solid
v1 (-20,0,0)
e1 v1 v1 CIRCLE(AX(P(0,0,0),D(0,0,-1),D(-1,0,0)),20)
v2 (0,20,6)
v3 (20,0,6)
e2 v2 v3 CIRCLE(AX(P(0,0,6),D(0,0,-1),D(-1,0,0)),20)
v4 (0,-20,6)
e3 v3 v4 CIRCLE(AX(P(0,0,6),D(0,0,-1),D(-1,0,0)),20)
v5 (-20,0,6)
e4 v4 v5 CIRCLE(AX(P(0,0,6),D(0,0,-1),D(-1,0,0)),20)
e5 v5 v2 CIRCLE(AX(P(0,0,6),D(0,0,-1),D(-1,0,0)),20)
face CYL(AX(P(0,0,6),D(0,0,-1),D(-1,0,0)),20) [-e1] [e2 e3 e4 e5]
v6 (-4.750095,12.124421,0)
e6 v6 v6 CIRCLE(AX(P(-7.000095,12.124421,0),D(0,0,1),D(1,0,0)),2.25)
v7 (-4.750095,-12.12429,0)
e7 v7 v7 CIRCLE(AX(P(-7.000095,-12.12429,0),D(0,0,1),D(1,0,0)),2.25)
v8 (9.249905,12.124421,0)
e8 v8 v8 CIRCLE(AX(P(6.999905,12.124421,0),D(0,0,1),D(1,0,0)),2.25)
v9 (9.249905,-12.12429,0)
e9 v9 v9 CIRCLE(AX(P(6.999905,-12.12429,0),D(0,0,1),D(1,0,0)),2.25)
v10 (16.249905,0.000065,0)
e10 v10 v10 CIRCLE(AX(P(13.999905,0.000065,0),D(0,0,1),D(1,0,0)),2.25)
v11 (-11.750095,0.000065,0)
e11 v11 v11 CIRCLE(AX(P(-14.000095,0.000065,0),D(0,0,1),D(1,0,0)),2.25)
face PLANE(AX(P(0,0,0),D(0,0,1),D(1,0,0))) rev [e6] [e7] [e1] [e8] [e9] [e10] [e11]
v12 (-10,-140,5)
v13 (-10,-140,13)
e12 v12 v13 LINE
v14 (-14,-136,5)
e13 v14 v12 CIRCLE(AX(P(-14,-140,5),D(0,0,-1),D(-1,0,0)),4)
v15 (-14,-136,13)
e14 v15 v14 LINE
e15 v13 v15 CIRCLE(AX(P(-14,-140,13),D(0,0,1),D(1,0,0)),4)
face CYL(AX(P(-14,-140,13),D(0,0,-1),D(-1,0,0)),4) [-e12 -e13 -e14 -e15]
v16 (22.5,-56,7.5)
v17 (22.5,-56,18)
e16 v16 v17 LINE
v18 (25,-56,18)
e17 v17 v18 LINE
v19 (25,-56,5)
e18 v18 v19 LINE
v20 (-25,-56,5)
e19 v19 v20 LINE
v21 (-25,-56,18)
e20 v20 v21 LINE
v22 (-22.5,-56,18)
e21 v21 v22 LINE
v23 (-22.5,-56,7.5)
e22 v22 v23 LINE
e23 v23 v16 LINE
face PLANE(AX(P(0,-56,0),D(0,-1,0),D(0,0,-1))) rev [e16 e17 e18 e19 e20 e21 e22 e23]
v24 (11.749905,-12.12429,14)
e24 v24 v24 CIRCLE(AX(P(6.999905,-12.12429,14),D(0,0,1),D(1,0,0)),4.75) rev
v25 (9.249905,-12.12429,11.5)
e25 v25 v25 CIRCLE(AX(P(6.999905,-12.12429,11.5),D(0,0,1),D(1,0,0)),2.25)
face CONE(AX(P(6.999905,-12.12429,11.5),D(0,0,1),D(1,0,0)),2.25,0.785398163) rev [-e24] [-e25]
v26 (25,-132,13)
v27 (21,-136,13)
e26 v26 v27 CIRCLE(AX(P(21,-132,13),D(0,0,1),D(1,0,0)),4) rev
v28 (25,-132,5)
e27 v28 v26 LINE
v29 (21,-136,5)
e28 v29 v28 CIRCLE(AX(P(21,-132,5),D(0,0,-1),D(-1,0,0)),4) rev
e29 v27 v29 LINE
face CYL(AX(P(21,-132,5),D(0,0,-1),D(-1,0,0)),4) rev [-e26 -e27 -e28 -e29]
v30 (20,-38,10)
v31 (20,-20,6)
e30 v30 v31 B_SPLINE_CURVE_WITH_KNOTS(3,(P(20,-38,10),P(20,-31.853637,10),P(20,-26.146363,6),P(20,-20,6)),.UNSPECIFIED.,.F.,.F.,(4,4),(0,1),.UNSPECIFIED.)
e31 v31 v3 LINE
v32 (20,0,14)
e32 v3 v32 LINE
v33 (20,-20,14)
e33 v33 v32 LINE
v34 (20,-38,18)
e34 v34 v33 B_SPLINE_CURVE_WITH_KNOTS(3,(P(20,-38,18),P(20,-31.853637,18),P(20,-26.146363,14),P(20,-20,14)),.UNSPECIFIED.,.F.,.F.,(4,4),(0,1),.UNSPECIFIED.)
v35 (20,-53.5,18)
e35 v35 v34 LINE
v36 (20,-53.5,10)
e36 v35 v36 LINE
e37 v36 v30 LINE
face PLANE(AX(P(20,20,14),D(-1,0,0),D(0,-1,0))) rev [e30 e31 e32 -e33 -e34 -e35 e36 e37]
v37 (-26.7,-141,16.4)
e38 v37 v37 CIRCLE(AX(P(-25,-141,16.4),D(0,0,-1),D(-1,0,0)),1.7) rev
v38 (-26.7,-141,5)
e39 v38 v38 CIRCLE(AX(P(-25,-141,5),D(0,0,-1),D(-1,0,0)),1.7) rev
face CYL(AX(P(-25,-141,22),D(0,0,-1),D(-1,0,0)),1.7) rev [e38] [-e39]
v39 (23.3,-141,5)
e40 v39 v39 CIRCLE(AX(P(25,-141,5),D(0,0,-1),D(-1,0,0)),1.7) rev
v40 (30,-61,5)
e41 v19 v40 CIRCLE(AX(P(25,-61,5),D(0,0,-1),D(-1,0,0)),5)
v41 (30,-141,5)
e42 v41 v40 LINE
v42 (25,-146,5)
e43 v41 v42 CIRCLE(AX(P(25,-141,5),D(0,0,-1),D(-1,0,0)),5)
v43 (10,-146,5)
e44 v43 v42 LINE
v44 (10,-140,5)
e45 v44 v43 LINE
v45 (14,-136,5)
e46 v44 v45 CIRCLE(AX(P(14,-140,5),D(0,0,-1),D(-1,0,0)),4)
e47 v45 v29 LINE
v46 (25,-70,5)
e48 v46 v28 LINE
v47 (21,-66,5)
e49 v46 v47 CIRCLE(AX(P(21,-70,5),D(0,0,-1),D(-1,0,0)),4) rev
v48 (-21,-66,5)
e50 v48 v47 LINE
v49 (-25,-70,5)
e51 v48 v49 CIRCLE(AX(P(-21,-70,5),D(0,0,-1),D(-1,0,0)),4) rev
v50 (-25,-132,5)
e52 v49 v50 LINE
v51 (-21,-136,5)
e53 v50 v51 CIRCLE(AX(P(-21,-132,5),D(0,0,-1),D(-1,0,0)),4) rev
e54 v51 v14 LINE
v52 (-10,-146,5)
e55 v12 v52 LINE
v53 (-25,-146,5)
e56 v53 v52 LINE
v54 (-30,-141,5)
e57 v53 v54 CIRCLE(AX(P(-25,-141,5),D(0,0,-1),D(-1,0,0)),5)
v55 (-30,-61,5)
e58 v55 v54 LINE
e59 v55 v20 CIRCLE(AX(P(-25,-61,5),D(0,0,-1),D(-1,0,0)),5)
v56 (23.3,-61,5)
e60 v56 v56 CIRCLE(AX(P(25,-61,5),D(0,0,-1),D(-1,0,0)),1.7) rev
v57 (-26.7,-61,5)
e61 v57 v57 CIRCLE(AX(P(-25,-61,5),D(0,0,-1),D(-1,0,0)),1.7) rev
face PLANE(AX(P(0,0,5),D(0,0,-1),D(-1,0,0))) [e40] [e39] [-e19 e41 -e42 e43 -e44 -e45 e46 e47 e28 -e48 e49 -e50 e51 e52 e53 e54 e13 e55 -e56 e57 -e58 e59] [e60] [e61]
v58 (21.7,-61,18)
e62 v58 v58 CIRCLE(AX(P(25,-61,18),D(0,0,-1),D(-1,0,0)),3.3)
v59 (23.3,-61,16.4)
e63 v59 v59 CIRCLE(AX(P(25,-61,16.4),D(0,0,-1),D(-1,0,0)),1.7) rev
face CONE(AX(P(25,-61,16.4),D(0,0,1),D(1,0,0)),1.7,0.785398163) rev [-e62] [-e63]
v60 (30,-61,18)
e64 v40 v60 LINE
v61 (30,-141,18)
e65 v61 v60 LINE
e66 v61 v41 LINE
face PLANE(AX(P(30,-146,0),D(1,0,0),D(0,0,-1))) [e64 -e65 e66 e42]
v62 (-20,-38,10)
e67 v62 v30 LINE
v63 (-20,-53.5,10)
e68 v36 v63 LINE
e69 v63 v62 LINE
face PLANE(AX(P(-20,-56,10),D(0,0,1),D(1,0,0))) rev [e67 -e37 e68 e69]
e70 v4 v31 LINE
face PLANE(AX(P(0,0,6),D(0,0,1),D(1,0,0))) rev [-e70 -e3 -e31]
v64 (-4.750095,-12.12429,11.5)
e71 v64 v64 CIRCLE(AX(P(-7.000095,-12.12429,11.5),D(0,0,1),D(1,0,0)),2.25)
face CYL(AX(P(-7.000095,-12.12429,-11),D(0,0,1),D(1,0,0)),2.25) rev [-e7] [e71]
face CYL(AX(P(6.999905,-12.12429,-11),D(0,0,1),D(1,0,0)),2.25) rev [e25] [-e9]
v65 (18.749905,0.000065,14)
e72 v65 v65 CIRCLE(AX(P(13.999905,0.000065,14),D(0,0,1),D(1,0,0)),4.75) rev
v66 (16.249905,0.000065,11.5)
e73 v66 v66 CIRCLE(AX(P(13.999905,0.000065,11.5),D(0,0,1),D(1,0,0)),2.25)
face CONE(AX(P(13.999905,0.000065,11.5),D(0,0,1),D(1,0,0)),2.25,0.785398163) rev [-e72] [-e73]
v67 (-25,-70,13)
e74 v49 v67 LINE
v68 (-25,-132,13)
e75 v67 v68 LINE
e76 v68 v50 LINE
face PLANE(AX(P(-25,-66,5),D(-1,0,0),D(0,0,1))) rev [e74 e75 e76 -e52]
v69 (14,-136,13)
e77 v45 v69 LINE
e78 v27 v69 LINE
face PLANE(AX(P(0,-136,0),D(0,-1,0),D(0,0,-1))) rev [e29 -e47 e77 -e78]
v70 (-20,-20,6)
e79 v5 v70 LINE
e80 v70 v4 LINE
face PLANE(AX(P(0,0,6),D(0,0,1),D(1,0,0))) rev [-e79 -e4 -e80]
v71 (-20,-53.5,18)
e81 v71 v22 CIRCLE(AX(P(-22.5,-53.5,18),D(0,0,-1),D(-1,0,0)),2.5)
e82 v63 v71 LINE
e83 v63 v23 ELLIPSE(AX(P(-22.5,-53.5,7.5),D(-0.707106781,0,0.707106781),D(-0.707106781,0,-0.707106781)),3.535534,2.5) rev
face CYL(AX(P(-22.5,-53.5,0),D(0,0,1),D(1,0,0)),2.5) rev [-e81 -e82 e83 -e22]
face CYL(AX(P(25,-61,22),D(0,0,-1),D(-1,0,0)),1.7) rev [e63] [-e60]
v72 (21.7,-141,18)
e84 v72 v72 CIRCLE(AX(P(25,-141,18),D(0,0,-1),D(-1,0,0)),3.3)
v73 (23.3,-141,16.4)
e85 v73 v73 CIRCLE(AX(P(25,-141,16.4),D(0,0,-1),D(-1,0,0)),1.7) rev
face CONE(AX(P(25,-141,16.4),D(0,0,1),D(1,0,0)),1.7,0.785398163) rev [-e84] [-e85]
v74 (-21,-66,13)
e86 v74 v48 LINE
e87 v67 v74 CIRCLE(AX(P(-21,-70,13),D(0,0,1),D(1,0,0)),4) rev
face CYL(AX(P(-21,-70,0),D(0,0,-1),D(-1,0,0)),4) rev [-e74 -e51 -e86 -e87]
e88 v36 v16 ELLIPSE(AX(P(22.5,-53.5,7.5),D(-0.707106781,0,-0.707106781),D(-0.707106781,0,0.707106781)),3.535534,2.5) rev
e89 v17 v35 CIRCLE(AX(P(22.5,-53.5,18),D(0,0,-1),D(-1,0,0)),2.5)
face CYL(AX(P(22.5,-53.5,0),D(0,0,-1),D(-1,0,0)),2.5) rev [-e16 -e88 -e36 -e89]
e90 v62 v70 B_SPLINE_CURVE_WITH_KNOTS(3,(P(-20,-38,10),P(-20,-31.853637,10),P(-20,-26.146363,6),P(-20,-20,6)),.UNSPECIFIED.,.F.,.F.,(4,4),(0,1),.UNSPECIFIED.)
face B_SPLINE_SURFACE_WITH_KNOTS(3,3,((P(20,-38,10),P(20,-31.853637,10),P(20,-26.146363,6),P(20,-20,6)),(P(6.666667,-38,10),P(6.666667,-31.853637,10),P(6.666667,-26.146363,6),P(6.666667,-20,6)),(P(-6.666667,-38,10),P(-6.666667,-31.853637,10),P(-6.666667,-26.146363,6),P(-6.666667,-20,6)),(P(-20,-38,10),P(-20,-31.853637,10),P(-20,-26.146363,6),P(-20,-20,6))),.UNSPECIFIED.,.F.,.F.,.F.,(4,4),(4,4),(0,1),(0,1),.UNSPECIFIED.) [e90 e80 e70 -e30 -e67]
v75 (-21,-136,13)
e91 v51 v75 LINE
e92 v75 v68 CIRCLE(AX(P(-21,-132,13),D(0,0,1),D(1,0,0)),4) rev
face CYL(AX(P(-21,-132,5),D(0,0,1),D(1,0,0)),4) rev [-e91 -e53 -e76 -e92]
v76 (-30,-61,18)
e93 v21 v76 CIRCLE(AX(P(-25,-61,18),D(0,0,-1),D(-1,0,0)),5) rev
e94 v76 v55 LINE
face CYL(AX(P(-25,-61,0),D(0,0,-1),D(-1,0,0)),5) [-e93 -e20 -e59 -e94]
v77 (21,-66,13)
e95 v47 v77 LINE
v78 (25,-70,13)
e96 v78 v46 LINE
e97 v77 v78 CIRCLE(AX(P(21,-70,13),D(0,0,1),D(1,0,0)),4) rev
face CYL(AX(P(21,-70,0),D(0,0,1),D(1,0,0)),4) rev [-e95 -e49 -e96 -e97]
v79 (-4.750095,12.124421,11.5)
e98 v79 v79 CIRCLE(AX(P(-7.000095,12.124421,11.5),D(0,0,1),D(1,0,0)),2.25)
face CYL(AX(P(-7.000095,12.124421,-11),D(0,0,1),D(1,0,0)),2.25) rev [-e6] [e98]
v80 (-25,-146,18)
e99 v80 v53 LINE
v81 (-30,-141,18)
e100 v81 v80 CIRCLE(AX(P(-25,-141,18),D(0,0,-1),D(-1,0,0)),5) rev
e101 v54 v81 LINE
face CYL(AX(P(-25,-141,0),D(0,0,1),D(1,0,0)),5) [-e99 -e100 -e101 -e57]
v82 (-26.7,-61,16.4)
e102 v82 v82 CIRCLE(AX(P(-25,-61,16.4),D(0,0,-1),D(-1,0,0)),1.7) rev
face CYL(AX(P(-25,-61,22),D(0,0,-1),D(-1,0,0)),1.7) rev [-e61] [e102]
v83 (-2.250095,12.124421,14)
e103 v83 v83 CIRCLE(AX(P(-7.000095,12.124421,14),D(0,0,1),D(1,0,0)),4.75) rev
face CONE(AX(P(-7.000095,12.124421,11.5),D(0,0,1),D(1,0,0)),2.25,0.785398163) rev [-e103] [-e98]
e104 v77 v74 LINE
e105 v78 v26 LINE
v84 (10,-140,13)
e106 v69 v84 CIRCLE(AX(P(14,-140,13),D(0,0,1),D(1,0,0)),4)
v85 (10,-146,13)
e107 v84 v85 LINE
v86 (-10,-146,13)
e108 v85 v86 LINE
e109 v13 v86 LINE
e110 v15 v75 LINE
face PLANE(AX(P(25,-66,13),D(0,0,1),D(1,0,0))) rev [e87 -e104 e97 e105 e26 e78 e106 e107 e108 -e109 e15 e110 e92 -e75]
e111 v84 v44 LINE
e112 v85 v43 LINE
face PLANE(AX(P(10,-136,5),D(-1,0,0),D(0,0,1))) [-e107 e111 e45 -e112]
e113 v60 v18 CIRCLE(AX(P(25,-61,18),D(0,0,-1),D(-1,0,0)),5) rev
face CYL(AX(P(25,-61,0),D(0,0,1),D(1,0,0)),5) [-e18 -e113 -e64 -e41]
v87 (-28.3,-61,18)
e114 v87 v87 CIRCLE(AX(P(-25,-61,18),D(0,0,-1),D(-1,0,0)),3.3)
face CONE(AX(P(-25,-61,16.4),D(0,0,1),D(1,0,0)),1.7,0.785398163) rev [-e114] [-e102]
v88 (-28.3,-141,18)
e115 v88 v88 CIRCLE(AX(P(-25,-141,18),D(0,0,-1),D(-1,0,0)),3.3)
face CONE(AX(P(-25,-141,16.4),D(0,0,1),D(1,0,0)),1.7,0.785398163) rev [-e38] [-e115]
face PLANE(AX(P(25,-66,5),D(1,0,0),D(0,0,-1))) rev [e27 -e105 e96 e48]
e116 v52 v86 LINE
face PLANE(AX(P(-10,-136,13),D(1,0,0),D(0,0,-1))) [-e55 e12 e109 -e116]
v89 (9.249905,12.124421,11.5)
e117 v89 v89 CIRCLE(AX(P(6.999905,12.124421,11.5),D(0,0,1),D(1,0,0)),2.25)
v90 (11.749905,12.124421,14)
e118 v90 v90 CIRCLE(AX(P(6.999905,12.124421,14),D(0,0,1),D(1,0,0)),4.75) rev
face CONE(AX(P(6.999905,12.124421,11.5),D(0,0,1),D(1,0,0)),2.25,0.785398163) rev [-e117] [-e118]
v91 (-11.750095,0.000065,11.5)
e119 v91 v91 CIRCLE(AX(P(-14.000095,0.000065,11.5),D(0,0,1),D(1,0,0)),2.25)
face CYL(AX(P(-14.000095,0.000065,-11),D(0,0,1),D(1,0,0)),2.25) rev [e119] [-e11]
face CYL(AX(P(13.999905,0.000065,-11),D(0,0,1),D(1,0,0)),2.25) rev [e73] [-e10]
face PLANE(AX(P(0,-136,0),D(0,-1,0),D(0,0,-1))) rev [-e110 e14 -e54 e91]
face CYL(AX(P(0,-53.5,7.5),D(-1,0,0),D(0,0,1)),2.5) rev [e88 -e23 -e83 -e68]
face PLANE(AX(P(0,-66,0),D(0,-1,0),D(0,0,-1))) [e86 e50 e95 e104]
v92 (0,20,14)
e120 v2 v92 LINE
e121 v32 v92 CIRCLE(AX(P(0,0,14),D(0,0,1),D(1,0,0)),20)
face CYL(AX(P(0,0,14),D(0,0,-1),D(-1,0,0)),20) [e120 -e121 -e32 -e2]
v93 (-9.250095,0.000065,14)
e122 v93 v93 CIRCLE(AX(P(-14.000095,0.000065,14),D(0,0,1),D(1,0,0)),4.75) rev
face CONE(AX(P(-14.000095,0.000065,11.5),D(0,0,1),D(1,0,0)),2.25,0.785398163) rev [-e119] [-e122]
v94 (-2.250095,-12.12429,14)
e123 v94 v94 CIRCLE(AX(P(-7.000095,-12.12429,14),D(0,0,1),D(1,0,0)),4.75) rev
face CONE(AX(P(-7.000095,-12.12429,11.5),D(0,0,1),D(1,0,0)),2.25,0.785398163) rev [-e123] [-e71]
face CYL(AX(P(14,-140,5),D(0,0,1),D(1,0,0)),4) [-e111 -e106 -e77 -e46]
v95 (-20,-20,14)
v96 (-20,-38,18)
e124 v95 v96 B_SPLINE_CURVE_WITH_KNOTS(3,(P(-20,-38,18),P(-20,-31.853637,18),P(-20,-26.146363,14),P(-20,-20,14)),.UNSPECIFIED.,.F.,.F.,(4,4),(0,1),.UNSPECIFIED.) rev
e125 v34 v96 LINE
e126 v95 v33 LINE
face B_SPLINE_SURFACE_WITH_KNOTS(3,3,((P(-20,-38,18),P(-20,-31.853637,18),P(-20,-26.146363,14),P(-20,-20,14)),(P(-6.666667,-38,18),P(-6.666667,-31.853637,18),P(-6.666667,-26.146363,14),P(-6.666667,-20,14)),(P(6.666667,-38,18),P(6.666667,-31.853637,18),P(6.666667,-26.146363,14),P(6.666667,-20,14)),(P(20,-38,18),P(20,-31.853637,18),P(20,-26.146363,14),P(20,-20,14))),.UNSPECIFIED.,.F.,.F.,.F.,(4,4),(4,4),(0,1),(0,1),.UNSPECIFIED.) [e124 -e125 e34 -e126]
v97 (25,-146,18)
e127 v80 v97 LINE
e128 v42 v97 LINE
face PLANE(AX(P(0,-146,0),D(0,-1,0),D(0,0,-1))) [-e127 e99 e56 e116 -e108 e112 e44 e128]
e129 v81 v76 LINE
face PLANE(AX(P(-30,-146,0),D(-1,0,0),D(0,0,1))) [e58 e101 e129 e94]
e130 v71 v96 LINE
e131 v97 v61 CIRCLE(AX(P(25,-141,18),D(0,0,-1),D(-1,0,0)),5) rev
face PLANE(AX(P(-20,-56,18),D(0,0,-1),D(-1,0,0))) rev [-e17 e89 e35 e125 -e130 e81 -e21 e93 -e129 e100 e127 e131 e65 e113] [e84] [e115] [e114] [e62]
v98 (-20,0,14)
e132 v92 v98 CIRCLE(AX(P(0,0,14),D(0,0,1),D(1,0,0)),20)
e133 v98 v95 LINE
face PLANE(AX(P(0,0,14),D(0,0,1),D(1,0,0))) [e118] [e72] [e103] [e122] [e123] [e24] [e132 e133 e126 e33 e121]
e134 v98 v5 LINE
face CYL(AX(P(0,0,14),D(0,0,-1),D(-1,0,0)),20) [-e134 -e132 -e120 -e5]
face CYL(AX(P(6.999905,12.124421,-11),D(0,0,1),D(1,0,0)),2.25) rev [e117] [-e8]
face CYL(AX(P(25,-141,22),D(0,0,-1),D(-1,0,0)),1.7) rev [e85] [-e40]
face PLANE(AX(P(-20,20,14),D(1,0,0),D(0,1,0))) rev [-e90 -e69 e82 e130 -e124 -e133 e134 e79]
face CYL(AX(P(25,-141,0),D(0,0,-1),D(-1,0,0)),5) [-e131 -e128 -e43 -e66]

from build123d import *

# Parameters (mm, degrees)
SKETCH7_W           = 40
SKETCH7_H           = 40
BOSS_EXTRUDE1_DEPTH = 14
LOFT1_START         = -20
LOFT1_DEPTH         = 40
SKETCH16_W          = 49.026286786
SKETCH16_H          = 65.242270374
SKETCH16_R          = 20
CUT_EXTRUDE3_DEPTH  = 6
SKETCH17_W          = 40
SKETCH17_H          = 8
BOSS_EXTRUDE5_DEPTH = 18
SKETCH10_R          = 2.25
CUT_EXTRUDE1_DEPTH  = 25
CHAMFER1_SIZE       = 2.5
FILLET3_R           = 20
SKETCH11_W          = 60
SKETCH11_H          = 18
BOSS_EXTRUDE6_DEPTH = 90
FILLET9_R           = 2.5
SKETCH20_W          = 50
SKETCH20_H          = 8
CUT_EXTRUDE4_DEPTH  = 80
SKETCH28_W          = 15
SKETCH28_H          = 8
BOSS_EXTRUDE7_DEPTH = 10
FILLET13_R          = 4
SKETCH37_W          = 60
SKETCH37_H          = 90
CUT_EXTRUDE8_DEPTH  = 5
FILLET16_R          = 5
SKETCH38_R          = 1.7
CUT_EXTRUDE9_DEPTH  = 22
CHAMFER3_SIZE       = 1.6


# Read off the part's stored shape, not the designer's step: Loft1
with BuildPart() as part:
    # Sketch7 → Boss-Extrude1 (new body)
    with BuildSketch(Plane.XY):
        Rectangle(SKETCH7_W, SKETCH7_H)
    extrude(amount=BOSS_EXTRUDE1_DEPTH)

    # Loft1 outline → Loft1 (add)
    with BuildSketch(Plane.YZ.offset(LOFT1_START)):
        with BuildLine():
            add(Edge.make_bspline(
                [(-38, 18), (-31.853637028, 18), (-26.146362972, 14), (-20, 14)],
                knots=[0, 0, 0, 0, 1, 1, 1, 1], degree=3))
            Line((-38, 18), (-38, 10))
            add(Edge.make_bspline(
                [(-38, 10), (-31.853637028, 10), (-26.146362972, 6), (-20, 6)],
                knots=[0, 0, 0, 0, 1, 1, 1, 1], degree=3))
            Line((-20, 6), (-20, 14))
        make_face()
    extrude(amount=LOFT1_DEPTH)

    # Sketch16 → Cut-Extrude3 (cut)
    with BuildSketch(Plane(origin=(0, 0, 0), x_dir=(-1, 0, 0), z_dir=(0, 0, -1))):
        Rectangle(SKETCH16_W, SKETCH16_H)
        Circle(SKETCH16_R, mode=Mode.SUBTRACT)
    extrude(amount=-CUT_EXTRUDE3_DEPTH, mode=Mode.SUBTRACT)

    # Sketch17 → Boss-Extrude5 (add)
    with BuildSketch(Plane(origin=(0, -38, 0), x_dir=(-1, 0, 0), z_dir=(0, -1, 0))):
        with Locations((0, -14)):
            Rectangle(SKETCH17_W, SKETCH17_H)
    extrude(amount=BOSS_EXTRUDE5_DEPTH)

    # Sketch10 → Cut-Extrude1 (cut)
    with BuildSketch(Plane.XY.offset(14)):
        with Locations((-7.00009521, 12.124420806)):
            Circle(SKETCH10_R)
        with Locations((6.99990479, 12.124420806)):
            Circle(SKETCH10_R)
        with Locations((13.99990479, 6.5153e-05)):
            Circle(SKETCH10_R)
        with Locations((6.99990479, -12.1242905)):
            Circle(SKETCH10_R)
        with Locations((-7.00009521, -12.1242905)):
            Circle(SKETCH10_R)
        with Locations((-14.00009521, 6.5153e-05)):
            Circle(SKETCH10_R)
    extrude(amount=-CUT_EXTRUDE1_DEPTH, mode=Mode.SUBTRACT)

    # Chamfer1
    chamfer1_edges = [part.edges().sort_by_distance(p)[0] for p in [
        (4.74990479, 12.124420806, 14),
        (-9.25009521, 12.124420806, 14),
        (-16.25009521, 6.5153e-05, 14),
        (-9.25009521, -12.1242905, 14),
        (4.74990479, -12.1242905, 14),
        (11.74990479, 6.5153e-05, 14),
    ]]
    chamfer(chamfer1_edges, length=CHAMFER1_SIZE)

    # Fillet3
    fillet3_edges = [part.edges().sort_by_distance(p)[0] for p in [
        (20, 20, 10),
        (-20, 20, 10),
    ]]
    fillet(fillet3_edges, radius=FILLET3_R - 0.0001)  # a hair under: the kernel refuses the full size

    # Sketch11 → Boss-Extrude6 (add)
    with BuildSketch(Plane(origin=(0, -56, -3.472963553), x_dir=(1, 0, 0), z_dir=(0, 1, 0))):
        with Locations((0, -12.472963553)):
            Rectangle(SKETCH11_W, SKETCH11_H)
    extrude(amount=-BOSS_EXTRUDE6_DEPTH)

    # Fillet9
    fillet9_edges = [part.edges().sort_by_distance(p)[0] for p in [
        (0, -56, 10),
        (-20, -56, 14),
        (20, -56, 14),
    ]]
    fillet(fillet9_edges, radius=FILLET9_R)

    # Sketch20 → Cut-Extrude4 (cut)
    with BuildSketch(Plane.XZ.offset(146)):
        with Locations((0, 9)):
            Rectangle(SKETCH20_W, SKETCH20_H)
    extrude(amount=-CUT_EXTRUDE4_DEPTH, mode=Mode.SUBTRACT)

    # Sketch28 → Boss-Extrude7 (add)
    with BuildSketch(Plane(origin=(0, -146, 0), x_dir=(-1, 0, 0), z_dir=(0, -1, 0))):
        with Locations((17.5, -9)):
            Rectangle(SKETCH28_W, SKETCH28_H)
        with Locations((-17.5, -9)):
            Rectangle(SKETCH28_W, SKETCH28_H)
    extrude(amount=-BOSS_EXTRUDE7_DEPTH)

    # Fillet13
    fillet13_edges = [part.edges().sort_by_distance(p)[0] for p in [
        (-25, -66, 9),
        (25, -66, 9),
        (-25, -136, 9),
        (-10, -136, 9),
        (10, -136, 9),
        (25, -136, 9),
    ]]
    fillet(fillet13_edges, radius=FILLET13_R)

    # Sketch37 → Cut-Extrude8 (cut)
    with BuildSketch(Plane.XY):
        with Locations((0, -101)):
            Rectangle(SKETCH37_W, SKETCH37_H)
    extrude(amount=CUT_EXTRUDE8_DEPTH, mode=Mode.SUBTRACT)

    # Fillet16
    fillet16_edges = [part.edges().sort_by_distance(p)[0] for p in [
        (30, -56, 11.5),
        (30, -146, 11.5),
        (-30, -146, 11.5),
        (-30, -56, 11.5),
    ]]
    fillet(fillet16_edges, radius=FILLET16_R)

    # Sketch38 → Cut-Extrude9 (cut)
    with BuildSketch(Plane.XY):
        with Locations(Location((25, -61, 0), (0, 0, 180))):
            Circle(SKETCH38_R)
        with Locations(Location((-25, -61, 0), (0, 0, 180))):
            Circle(SKETCH38_R)
        with Locations(Location((-25, -141, 0), (0, 0, 180))):
            Circle(SKETCH38_R)
        with Locations(Location((25, -141, 0), (0, 0, 180))):
            Circle(SKETCH38_R)
    extrude(amount=CUT_EXTRUDE9_DEPTH, mode=Mode.SUBTRACT)

    # Chamfer3
    chamfer3_edges = [part.edges().sort_by_distance(p)[0] for p in [
        (26.7, -141, 18),
        (-23.3, -141, 18),
        (-23.3, -61, 18),
        (26.7, -61, 18),
    ]]
    chamfer(chamfer3_edges, length=CHAMFER3_SIZE)


solid = part.part
